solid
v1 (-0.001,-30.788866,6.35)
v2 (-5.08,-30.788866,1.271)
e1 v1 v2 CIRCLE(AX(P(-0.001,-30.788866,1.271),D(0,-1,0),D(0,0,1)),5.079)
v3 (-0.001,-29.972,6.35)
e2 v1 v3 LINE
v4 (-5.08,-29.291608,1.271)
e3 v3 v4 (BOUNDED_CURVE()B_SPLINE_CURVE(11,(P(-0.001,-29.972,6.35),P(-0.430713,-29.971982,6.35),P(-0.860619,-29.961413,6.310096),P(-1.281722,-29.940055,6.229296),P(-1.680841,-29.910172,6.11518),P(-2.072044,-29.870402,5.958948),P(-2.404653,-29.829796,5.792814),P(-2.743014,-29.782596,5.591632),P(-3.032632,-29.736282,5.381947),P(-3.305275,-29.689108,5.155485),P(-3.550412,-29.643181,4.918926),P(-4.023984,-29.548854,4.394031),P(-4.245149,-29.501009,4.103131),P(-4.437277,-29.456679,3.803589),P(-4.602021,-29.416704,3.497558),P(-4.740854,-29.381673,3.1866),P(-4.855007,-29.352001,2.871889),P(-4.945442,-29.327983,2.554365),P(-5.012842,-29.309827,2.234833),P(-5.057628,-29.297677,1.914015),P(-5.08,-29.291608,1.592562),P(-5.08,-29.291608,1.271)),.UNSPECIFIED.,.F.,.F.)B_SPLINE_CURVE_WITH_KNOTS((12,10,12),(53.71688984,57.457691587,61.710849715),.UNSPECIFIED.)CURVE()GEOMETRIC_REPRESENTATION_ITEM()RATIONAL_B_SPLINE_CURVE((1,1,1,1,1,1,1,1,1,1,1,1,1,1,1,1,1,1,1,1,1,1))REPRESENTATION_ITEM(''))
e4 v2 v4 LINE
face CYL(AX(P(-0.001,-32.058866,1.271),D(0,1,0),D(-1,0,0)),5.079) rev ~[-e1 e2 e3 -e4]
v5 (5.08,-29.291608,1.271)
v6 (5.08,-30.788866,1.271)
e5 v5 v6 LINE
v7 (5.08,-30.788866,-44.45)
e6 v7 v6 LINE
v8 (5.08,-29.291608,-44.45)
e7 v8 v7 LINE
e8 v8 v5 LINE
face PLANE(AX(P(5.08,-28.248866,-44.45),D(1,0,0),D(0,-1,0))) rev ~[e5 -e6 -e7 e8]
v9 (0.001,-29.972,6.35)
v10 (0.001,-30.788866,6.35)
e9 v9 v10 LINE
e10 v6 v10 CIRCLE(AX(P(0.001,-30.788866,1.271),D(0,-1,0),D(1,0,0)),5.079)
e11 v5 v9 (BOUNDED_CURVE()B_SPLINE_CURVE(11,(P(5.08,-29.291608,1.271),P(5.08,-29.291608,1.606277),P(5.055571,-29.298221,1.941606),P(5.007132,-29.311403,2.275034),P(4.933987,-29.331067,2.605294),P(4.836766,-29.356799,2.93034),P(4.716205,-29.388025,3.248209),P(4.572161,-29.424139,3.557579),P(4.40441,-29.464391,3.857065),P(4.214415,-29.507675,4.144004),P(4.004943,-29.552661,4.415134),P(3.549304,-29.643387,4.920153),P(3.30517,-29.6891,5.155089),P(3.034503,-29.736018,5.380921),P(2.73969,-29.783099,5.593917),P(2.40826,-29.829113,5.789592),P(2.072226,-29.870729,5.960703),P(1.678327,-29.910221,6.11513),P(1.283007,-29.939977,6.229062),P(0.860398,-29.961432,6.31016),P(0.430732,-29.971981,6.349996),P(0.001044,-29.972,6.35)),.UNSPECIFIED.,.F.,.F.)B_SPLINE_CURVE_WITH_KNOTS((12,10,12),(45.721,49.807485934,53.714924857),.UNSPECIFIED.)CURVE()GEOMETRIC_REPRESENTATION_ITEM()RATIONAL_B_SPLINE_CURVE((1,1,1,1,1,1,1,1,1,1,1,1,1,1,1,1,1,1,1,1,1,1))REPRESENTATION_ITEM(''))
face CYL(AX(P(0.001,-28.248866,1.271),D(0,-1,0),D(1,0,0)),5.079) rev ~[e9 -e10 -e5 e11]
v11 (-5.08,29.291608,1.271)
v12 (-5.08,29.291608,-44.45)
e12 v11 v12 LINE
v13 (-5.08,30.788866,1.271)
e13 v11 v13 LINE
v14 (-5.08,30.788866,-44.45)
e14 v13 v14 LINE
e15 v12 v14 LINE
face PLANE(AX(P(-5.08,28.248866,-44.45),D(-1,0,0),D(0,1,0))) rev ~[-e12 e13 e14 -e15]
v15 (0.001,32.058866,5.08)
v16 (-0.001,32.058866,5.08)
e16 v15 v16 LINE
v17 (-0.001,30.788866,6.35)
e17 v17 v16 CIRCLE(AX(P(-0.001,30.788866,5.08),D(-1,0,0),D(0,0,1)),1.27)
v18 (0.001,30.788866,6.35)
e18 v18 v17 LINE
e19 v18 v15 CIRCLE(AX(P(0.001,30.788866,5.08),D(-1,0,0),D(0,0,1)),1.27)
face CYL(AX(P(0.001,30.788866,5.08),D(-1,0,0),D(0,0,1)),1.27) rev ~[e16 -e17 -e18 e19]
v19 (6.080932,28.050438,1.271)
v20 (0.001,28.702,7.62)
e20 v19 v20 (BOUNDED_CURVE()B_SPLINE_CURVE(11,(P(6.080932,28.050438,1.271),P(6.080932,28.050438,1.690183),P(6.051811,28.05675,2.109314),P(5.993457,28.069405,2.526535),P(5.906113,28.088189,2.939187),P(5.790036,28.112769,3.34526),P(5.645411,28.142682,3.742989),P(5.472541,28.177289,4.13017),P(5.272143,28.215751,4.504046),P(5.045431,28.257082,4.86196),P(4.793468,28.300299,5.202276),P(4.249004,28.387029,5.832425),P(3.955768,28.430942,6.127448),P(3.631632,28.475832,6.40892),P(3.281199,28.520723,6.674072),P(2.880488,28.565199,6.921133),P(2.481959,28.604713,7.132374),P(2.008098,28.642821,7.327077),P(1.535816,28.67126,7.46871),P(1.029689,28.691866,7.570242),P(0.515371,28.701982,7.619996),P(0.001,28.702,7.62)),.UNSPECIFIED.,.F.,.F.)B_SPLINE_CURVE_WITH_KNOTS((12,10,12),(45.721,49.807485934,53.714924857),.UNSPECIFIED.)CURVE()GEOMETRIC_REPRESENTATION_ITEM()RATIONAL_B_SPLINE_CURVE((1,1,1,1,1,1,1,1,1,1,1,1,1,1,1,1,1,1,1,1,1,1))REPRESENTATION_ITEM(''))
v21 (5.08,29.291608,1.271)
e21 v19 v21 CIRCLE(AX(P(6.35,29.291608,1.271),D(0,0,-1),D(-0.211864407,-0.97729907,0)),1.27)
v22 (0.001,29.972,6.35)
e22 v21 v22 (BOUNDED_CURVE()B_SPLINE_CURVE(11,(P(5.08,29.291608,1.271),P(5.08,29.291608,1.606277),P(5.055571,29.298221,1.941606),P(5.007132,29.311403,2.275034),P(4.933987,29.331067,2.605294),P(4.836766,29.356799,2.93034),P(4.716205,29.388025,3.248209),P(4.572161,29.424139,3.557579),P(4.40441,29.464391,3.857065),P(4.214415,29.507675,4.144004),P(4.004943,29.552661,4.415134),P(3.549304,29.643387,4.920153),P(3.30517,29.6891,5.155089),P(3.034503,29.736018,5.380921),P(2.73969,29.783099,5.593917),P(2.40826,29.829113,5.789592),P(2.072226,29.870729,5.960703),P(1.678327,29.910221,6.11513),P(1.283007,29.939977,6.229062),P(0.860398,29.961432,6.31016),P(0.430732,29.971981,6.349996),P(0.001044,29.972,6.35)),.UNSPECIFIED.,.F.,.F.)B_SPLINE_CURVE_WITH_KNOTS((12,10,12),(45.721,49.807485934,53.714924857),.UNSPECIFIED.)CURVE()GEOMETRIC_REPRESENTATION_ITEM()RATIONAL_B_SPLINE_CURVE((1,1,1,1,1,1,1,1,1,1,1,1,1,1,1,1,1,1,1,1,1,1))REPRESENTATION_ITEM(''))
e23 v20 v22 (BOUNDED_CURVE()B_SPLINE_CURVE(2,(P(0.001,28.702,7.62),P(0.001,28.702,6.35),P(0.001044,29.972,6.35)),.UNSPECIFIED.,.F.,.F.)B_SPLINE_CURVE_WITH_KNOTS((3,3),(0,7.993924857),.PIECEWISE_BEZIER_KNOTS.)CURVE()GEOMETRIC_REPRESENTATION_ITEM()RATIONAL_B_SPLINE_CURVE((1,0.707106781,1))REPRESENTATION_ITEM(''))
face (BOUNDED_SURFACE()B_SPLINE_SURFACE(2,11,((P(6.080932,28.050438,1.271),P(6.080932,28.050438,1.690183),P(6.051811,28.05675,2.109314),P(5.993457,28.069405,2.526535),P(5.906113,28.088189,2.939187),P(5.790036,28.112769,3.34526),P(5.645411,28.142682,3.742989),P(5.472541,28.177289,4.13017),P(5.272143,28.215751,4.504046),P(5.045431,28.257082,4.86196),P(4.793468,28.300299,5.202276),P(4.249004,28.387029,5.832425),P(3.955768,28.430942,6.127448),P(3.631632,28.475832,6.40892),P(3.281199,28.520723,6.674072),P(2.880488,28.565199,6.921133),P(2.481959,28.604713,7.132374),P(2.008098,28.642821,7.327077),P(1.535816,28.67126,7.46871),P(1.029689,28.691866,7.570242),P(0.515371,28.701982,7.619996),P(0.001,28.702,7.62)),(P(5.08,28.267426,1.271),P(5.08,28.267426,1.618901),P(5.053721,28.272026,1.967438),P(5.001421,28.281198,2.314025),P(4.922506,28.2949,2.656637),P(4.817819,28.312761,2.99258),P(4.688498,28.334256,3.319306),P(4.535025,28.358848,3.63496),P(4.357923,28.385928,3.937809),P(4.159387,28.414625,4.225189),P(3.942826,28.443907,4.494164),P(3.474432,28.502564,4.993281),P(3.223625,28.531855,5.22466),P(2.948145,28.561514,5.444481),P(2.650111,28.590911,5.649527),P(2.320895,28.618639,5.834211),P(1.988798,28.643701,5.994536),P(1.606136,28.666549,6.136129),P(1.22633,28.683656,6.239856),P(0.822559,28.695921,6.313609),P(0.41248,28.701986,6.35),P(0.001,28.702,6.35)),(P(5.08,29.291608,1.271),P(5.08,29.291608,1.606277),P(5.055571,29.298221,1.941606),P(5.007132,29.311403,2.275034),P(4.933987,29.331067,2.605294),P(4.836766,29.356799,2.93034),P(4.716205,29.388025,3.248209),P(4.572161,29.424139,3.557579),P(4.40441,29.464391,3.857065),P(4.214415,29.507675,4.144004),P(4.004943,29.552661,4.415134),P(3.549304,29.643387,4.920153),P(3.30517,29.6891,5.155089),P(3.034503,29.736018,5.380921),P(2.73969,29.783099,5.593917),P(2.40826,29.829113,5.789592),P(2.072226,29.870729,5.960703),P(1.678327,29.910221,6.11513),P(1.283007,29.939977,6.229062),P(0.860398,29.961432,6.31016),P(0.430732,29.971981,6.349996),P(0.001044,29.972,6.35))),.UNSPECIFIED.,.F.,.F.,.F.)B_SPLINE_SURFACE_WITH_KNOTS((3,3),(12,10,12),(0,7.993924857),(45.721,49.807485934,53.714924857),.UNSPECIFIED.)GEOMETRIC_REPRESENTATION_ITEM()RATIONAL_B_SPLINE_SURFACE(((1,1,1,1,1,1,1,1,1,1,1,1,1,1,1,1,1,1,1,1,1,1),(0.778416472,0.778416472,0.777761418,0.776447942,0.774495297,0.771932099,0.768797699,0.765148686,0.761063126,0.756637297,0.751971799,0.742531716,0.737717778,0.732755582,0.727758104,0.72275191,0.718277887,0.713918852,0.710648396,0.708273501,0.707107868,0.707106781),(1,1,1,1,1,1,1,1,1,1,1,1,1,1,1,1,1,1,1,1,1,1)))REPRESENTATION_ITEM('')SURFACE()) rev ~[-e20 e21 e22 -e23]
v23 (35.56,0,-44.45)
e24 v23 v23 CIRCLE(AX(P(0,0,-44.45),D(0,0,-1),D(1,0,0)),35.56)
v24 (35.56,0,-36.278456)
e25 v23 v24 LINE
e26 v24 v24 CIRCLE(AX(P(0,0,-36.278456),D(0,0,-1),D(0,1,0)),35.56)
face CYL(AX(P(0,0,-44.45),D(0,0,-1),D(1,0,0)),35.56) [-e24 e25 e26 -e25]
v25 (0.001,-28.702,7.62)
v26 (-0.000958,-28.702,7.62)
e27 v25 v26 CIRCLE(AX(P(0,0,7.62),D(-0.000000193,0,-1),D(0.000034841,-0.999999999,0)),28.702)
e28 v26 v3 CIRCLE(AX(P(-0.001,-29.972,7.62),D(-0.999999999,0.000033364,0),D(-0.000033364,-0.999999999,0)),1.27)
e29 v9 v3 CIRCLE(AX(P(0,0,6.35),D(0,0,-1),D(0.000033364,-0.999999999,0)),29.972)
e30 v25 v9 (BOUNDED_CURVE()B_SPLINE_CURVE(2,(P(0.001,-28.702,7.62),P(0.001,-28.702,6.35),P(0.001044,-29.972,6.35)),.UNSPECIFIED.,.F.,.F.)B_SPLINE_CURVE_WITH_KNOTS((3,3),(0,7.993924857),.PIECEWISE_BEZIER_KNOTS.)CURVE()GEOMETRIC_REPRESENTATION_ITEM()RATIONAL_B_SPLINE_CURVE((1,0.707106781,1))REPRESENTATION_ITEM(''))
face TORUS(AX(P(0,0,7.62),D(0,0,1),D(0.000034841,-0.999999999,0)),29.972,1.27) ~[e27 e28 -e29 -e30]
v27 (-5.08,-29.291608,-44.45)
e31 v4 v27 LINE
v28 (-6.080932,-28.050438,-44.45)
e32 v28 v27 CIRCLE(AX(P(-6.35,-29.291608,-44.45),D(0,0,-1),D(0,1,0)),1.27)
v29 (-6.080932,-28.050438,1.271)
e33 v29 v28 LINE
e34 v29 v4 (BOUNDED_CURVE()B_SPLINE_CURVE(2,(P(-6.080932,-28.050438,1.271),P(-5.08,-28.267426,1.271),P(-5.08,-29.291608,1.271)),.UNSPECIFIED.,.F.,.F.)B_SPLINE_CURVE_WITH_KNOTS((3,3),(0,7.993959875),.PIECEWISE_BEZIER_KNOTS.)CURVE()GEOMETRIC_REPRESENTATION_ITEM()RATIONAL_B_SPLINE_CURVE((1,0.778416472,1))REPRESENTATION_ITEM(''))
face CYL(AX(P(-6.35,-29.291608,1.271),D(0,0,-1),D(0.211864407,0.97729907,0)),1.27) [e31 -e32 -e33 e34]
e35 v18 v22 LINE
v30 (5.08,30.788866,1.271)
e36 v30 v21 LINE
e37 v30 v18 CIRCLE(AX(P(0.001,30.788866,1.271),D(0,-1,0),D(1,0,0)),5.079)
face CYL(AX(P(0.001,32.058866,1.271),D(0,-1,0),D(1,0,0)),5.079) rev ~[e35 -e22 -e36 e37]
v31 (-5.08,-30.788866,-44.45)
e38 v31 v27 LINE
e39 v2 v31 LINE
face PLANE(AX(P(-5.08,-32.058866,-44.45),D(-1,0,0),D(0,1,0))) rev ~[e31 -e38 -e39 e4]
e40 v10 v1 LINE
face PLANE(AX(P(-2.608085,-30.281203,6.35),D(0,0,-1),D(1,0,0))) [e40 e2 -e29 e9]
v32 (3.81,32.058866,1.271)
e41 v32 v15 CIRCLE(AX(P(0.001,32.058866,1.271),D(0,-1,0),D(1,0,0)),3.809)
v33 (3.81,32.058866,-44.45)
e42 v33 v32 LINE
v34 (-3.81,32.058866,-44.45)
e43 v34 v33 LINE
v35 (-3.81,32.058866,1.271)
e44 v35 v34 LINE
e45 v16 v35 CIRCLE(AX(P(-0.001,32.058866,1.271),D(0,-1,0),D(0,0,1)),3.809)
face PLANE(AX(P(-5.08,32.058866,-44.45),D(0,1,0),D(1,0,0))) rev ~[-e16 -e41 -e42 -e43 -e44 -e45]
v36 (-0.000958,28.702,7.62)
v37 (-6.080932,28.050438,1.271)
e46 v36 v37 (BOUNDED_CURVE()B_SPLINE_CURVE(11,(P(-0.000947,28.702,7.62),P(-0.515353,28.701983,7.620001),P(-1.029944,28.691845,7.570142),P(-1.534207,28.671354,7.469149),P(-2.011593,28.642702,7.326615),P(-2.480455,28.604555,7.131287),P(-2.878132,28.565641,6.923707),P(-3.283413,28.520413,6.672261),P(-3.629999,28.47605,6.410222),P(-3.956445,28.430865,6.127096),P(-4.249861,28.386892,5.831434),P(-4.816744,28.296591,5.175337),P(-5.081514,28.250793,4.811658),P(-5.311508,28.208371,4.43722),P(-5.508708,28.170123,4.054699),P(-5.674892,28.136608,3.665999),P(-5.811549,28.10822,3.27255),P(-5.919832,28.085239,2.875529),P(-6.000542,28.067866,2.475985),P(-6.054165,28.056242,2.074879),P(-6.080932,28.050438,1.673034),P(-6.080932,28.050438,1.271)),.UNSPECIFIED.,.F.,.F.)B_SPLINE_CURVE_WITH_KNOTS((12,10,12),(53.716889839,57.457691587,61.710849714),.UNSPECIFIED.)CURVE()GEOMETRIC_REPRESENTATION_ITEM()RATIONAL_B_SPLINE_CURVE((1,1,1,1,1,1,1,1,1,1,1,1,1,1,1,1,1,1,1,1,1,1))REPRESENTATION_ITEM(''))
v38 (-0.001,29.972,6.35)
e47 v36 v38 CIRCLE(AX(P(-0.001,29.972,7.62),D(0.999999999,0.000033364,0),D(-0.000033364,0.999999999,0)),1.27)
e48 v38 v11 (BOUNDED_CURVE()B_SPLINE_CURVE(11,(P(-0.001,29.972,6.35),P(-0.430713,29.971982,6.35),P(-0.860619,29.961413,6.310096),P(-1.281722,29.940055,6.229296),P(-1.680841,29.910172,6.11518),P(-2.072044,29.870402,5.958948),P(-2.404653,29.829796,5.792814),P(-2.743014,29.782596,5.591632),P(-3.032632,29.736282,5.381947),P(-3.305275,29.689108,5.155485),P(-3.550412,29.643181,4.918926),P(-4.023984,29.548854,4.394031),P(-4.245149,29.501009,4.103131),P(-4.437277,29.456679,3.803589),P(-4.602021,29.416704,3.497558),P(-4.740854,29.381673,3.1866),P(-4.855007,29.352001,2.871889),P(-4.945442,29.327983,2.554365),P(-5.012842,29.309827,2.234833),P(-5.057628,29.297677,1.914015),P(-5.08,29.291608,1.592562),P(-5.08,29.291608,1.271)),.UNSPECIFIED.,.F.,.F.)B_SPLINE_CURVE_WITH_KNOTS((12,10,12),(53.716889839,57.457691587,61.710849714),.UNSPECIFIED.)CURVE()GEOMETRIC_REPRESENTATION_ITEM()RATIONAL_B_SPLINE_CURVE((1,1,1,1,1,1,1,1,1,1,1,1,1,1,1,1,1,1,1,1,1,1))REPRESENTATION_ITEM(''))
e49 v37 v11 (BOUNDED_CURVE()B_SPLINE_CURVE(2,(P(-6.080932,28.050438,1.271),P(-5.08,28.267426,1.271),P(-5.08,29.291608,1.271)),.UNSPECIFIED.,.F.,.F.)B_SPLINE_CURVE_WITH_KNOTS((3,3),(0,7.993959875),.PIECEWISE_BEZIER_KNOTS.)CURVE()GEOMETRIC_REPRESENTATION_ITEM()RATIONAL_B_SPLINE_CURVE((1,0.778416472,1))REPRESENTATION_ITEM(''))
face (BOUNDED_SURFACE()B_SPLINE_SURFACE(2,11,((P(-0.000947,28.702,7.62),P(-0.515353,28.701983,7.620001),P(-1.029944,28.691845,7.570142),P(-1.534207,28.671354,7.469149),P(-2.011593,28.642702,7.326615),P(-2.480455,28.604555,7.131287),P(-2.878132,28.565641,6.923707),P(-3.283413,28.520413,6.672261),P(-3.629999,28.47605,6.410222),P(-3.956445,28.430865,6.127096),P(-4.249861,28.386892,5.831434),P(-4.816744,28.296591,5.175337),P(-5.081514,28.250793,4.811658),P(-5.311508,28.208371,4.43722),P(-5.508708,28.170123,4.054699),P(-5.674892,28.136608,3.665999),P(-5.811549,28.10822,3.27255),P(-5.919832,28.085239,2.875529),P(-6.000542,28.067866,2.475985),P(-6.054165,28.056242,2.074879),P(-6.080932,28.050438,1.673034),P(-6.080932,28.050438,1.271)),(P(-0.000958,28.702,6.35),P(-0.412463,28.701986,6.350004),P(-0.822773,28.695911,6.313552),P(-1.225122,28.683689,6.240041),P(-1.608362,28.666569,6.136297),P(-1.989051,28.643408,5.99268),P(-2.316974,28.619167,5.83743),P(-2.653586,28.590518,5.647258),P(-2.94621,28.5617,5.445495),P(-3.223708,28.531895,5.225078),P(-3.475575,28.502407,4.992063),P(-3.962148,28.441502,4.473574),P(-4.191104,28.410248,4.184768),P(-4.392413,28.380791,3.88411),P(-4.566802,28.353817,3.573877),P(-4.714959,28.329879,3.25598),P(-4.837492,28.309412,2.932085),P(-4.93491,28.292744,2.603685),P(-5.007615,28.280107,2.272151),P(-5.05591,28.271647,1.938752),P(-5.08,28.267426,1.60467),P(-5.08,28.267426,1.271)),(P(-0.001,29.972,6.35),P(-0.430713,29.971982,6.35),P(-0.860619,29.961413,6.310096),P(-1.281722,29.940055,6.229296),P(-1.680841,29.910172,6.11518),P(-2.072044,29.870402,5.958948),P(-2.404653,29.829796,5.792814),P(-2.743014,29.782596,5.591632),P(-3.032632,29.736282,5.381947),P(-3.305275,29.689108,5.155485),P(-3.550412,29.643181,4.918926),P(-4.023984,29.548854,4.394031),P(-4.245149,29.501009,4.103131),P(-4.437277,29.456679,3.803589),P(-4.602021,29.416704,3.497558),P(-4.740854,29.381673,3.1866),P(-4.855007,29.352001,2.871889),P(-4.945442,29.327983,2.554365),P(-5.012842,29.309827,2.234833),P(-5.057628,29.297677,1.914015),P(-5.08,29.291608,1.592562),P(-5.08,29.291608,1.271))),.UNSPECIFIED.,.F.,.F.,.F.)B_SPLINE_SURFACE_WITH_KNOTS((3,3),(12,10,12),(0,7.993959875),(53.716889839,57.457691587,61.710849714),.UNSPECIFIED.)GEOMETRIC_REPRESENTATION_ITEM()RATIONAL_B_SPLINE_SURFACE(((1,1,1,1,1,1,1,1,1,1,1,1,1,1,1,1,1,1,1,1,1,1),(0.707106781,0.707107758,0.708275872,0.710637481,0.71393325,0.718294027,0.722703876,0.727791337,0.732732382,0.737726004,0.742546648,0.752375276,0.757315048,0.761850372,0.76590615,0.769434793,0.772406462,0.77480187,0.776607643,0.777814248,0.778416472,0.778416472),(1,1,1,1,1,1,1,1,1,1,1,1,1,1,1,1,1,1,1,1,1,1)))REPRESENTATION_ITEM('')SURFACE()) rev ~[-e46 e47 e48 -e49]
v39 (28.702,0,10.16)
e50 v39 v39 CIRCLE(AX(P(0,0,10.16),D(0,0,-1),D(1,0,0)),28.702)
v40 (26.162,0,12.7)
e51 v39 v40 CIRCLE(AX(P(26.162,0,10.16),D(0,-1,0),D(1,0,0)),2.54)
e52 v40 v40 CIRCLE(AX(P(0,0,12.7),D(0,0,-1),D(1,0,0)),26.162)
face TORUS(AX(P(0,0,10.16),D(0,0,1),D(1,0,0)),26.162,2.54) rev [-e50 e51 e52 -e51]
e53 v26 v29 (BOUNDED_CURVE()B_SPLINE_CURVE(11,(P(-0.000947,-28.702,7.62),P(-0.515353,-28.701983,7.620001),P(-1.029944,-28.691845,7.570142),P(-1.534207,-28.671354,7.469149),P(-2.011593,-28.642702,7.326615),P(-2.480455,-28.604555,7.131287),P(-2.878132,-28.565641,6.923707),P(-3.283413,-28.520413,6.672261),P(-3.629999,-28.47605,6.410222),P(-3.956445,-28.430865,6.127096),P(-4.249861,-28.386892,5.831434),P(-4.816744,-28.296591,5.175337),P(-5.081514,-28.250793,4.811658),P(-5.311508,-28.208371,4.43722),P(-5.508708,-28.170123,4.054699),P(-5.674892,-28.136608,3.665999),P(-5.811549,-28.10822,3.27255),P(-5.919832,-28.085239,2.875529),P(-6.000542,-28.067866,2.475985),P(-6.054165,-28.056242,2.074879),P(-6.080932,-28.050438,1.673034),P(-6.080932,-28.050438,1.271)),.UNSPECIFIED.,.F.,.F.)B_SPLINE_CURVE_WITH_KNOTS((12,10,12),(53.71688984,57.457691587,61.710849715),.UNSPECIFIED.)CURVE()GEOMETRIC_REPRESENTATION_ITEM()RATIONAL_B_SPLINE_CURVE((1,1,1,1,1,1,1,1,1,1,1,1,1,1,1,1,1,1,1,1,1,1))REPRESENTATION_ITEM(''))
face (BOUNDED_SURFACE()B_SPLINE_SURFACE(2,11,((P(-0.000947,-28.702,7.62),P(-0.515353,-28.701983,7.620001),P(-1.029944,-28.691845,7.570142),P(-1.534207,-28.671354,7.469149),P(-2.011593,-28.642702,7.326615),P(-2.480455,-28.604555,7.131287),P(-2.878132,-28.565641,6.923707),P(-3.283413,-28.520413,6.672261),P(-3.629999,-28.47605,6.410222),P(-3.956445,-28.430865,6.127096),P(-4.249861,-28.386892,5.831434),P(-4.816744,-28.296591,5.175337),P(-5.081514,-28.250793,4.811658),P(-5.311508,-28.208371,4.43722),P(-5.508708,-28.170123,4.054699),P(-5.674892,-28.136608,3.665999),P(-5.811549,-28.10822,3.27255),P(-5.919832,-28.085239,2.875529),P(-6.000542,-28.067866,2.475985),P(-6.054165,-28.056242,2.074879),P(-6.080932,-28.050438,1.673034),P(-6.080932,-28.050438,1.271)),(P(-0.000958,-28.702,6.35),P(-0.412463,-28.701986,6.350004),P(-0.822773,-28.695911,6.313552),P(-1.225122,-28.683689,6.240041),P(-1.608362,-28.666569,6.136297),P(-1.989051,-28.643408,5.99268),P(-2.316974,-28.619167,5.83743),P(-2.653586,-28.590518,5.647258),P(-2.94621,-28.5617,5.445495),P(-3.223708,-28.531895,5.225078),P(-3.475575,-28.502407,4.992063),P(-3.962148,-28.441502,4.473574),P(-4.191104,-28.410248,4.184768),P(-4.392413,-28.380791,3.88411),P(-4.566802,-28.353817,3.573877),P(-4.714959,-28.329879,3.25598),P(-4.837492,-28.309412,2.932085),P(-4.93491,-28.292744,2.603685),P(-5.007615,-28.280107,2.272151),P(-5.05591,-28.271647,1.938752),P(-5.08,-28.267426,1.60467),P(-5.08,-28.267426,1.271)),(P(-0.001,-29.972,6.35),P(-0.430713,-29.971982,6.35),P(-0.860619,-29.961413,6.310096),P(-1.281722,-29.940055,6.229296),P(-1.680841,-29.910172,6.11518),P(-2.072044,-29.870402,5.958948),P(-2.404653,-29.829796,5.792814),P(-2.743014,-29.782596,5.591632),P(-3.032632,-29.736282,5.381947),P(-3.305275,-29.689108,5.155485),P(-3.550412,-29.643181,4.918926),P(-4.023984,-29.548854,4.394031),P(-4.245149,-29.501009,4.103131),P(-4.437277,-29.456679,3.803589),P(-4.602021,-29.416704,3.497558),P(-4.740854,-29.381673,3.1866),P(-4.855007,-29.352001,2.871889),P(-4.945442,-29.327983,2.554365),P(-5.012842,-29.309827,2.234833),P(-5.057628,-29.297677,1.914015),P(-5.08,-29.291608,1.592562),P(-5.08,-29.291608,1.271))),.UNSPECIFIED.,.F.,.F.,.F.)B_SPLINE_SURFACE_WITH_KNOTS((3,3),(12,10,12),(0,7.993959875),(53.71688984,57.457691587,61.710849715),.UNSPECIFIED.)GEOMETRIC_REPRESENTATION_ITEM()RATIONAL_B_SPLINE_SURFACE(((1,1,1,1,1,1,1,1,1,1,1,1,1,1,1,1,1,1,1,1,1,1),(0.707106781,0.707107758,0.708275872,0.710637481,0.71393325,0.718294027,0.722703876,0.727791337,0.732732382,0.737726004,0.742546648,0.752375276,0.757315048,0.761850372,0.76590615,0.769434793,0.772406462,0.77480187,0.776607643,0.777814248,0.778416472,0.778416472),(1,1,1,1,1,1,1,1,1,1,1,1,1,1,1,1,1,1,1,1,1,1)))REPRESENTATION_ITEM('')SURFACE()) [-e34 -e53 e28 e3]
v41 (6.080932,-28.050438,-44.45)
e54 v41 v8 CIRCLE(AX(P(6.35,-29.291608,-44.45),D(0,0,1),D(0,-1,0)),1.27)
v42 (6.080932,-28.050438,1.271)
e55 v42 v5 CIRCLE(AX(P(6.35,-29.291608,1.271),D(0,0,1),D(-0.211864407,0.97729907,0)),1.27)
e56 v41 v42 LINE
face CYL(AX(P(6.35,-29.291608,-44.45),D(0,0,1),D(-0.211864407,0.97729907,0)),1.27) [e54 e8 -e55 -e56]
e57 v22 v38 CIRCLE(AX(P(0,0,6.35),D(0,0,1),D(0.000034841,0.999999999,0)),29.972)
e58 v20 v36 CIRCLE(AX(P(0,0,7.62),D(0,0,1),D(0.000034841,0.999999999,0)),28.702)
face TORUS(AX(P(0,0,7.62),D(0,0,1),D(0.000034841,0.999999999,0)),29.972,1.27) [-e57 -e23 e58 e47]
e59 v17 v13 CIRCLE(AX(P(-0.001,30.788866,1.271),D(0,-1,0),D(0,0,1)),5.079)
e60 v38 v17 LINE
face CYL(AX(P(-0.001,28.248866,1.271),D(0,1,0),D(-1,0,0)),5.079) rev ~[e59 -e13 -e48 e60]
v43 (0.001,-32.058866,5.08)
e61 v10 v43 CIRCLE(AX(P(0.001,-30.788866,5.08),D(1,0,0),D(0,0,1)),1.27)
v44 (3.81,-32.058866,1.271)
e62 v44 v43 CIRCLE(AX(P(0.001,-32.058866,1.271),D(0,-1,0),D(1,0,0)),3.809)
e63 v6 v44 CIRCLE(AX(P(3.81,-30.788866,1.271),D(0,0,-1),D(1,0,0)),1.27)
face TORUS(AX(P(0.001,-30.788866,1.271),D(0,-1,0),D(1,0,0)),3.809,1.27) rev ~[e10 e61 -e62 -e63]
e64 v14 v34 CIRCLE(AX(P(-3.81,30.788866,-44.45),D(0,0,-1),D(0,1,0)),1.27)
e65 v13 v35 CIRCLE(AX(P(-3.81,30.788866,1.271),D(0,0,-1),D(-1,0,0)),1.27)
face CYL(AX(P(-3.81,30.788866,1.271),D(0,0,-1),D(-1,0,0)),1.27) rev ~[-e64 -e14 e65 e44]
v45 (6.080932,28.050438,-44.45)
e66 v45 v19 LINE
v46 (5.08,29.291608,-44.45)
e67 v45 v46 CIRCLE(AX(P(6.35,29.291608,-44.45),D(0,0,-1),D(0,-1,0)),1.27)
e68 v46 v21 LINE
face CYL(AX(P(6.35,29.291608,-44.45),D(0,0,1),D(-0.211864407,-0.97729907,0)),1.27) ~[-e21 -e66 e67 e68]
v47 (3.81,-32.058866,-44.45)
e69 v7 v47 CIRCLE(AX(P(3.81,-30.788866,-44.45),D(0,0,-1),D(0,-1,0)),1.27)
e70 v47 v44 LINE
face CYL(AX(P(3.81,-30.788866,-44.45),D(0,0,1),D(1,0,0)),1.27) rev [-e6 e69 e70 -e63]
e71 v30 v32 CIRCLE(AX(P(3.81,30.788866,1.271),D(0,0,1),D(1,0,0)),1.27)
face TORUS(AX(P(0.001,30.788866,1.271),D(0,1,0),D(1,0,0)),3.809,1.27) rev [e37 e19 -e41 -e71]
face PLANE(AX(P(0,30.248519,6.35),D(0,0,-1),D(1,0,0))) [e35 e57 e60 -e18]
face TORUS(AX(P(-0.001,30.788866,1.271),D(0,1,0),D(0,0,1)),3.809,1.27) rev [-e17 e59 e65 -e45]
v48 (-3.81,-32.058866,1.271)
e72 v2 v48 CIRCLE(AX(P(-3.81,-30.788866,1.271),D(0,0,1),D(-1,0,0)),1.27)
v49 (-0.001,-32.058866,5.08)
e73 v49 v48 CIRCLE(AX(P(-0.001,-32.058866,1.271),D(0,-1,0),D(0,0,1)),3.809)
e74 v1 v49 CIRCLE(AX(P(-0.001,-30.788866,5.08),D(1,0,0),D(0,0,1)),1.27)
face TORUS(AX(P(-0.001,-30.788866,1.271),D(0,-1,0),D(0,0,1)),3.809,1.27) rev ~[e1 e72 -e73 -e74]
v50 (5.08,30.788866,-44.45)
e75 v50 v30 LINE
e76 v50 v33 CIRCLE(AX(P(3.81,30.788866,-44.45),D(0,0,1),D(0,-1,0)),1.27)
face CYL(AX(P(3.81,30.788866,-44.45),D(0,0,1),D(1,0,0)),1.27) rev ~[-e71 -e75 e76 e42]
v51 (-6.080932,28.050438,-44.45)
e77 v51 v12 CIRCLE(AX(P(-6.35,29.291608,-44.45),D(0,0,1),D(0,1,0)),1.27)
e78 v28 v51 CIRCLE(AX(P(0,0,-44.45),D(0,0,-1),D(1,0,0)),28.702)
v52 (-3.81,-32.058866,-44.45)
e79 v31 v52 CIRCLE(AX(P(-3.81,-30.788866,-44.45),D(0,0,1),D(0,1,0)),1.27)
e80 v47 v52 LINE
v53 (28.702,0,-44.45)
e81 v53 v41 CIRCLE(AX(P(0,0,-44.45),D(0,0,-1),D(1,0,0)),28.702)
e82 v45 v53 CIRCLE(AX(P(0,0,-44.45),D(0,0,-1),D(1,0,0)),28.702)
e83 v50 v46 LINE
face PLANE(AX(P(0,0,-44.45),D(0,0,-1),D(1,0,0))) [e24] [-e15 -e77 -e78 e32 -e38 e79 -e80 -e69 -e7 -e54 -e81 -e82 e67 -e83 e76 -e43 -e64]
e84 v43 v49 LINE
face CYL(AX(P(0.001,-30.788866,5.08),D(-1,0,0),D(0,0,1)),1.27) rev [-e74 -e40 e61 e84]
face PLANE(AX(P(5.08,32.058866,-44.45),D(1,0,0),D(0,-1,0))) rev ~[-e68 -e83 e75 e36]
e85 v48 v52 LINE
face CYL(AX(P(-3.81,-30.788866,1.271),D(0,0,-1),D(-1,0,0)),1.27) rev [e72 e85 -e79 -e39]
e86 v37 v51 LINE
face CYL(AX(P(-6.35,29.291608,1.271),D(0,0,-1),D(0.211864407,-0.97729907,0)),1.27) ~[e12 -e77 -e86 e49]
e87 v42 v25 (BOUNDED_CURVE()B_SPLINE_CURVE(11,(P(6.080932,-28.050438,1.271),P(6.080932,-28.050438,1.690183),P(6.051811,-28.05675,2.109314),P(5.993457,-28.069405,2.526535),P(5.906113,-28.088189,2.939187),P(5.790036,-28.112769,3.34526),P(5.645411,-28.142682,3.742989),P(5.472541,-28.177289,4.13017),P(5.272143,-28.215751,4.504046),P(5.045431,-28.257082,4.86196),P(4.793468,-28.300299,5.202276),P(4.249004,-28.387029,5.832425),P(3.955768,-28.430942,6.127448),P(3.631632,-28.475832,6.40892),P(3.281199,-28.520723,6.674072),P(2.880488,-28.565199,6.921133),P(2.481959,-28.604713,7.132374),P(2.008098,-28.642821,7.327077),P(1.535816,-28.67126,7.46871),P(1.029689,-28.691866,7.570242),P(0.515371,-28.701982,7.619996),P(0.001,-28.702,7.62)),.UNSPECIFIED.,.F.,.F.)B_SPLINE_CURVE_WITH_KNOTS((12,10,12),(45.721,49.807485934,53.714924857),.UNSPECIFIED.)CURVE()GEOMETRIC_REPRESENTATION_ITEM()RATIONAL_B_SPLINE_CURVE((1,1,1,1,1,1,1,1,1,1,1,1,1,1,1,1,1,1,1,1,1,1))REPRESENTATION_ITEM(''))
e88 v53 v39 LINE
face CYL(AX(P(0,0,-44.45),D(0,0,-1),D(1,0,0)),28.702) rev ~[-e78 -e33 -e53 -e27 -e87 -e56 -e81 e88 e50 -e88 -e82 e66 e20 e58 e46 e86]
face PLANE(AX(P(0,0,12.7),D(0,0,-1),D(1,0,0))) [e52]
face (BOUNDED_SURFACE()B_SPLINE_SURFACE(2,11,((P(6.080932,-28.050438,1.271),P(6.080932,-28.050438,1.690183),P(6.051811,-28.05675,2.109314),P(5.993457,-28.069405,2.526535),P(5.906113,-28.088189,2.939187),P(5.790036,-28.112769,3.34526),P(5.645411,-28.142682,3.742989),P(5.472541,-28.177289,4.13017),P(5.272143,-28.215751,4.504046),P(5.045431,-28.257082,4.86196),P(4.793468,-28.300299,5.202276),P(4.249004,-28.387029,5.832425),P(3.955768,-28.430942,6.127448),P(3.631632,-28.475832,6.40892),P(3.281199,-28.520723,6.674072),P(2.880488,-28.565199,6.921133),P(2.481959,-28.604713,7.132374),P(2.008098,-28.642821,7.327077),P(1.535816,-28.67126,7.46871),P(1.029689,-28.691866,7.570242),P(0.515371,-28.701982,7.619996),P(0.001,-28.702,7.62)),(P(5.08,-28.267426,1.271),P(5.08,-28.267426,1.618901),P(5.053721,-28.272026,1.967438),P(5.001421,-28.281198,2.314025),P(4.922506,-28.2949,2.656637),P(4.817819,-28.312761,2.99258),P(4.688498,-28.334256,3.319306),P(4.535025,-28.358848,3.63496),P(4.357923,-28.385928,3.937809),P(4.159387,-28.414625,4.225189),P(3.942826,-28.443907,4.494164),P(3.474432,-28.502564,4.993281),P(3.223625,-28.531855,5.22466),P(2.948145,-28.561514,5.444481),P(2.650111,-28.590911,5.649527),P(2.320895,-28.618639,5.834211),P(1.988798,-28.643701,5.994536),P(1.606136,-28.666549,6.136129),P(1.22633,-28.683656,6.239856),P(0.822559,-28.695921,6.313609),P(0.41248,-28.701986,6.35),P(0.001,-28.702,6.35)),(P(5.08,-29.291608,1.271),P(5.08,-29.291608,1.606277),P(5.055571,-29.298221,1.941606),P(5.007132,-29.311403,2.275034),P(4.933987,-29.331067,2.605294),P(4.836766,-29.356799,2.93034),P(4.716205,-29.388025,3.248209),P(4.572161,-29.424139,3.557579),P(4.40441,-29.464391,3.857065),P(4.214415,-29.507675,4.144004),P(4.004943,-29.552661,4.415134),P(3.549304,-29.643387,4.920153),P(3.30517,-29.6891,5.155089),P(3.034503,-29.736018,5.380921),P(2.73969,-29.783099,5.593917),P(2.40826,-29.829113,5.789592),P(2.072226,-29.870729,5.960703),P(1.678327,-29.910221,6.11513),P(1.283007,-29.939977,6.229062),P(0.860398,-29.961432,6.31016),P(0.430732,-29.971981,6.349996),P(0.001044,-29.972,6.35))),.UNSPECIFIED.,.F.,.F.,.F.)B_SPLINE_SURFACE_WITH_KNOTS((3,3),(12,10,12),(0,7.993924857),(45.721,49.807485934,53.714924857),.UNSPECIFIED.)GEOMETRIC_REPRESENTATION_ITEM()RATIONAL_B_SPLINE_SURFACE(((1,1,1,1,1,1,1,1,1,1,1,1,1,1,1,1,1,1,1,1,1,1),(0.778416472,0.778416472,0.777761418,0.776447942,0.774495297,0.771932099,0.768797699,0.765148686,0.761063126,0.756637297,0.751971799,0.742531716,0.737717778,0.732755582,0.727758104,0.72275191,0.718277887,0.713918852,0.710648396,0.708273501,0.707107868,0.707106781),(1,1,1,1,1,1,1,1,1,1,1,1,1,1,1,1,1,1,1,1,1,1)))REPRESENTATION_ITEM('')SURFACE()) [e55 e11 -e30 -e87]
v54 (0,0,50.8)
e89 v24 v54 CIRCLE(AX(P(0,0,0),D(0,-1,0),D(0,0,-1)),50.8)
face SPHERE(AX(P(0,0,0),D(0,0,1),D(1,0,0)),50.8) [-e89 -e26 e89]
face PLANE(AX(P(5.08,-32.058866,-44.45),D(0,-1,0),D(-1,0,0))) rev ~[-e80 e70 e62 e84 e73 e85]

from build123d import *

# Parameters (mm, degrees)
F3_R      = 128.0515086977
F4_DEPTH  = 25.4
F5_R      = 35.56
F6_DEPTH  = 25.4
F7_R      = 28.702
F8_DEPTH  = 57.15
F10_DEPTH = 50.8
F11_R     = 5.079
F12_R     = 1.27
F13_R     = 2.54


# Not quite as in the source:
# - a fillet or chamfer is up to 0.001 mm smaller than in the source, because OpenCascade refuses the exact size


with BuildPart() as f1:
    # F0 (on Front) → F1 (revolve)
    with BuildSketch(Plane.XZ):
        with BuildLine():
            Line((0, 0), (0, -50.8))
            ThreePointArc((0, -50.8), (50.8, 0), (0, 50.8))
            Line((0, 50.8), (0, 0))
        make_face()
    revolve(axis=Axis((0, 0, 25.4), (0, 0, 1)))

    # F3 (on offset) → F4 (cut)
    with BuildSketch(Plane.XY.offset(-44.45)):
        with Locations((0, 3.5303835757)):
            Circle(F3_R)
    extrude(amount=-F4_DEPTH, mode=Mode.SUBTRACT)

    # F5 (on face) → F6 (join)
    with BuildSketch(Plane(origin=(0, 0, -44.45), x_dir=(1, 0, 0), z_dir=(0, 0, -1))):
        Circle(F5_R)
    extrude(amount=-F6_DEPTH)

    # F7 (on face) → F8 (cut)
    with BuildSketch(Plane(origin=(0, 0, -44.45), x_dir=(1, 0, 0), z_dir=(0, 0, -1))):
        Circle(F7_R)
    extrude(amount=-F8_DEPTH, mode=Mode.SUBTRACT)

    # F9 (on face) → F10 (cut)
    with BuildSketch(Plane(origin=(0, 0, -44.45), x_dir=(1, 0, 0), z_dir=(0, 0, -1))):
        with BuildLine():
            ThreePointArc((-5.08, 28.2488655347), (-2.5500848439, 28.588491938), (0, 28.702))
            Line((0, 28.702), (0, 32.0588655347))
            Line((0, 32.0588655347), (-5.08, 32.0588655347))
            Line((-5.08, 32.0588655347), (-5.08, 28.2488655347))
        make_face()
        with BuildLine():
            ThreePointArc((0, 28.702), (2.5500848439, 28.588491938), (5.08, 28.2488655347))
            Line((5.08, 28.2488655347), (5.08, 32.0588655347))
            Line((5.08, 32.0588655347), (0, 32.0588655347))
            Line((0, 32.0588655347), (0, 28.702))
        make_face()
        with BuildLine():
            Line((5.08, -32.0588655347), (5.08, -28.2488655347))
            ThreePointArc((5.08, -28.2488655347), (0, -28.702), (-5.08, -28.2488655347))
            Line((-5.08, -28.2488655347), (-5.08, -32.0588655347))
            Line((-5.08, -32.0588655347), (0, -32.0588655347))
            Line((0, -32.0588655347), (5.08, -32.0588655347))
        make_face()
    extrude(amount=-F10_DEPTH, mode=Mode.SUBTRACT)

    # F11 (radius 5.08 in the source; OpenCascade refuses exactly that, so slightly less here)
    f11_edges = [f1.edges().sort_by_distance(p)[0] for p in [
        (-5.08, -30.153866, 6.35),
        (5.08, -30.153866, 6.35),
        (5.08, 30.153866, 6.35),
        (-5.08, 30.153866, 6.35),
    ]]
    fillet(f11_edges, radius=F11_R)

    # F12
    f12_edges = [f1.edges().sort_by_distance(p)[0] for p in [
        (5.08, 28.248866, -21.5895),
        (5.08, 32.058866, -21.5895),
        (5.08, -32.058866, -21.5895),
        (5.08, -28.248866, -21.5895),
    ]]
    fillet(f12_edges, radius=F12_R)

    # F13
    f13_edges = [f1.edges().sort_by_distance(p)[0] for p in [
        (-28.702, 0, 12.7),
    ]]
    fillet(f13_edges, radius=F13_R)


solid = f1.part
